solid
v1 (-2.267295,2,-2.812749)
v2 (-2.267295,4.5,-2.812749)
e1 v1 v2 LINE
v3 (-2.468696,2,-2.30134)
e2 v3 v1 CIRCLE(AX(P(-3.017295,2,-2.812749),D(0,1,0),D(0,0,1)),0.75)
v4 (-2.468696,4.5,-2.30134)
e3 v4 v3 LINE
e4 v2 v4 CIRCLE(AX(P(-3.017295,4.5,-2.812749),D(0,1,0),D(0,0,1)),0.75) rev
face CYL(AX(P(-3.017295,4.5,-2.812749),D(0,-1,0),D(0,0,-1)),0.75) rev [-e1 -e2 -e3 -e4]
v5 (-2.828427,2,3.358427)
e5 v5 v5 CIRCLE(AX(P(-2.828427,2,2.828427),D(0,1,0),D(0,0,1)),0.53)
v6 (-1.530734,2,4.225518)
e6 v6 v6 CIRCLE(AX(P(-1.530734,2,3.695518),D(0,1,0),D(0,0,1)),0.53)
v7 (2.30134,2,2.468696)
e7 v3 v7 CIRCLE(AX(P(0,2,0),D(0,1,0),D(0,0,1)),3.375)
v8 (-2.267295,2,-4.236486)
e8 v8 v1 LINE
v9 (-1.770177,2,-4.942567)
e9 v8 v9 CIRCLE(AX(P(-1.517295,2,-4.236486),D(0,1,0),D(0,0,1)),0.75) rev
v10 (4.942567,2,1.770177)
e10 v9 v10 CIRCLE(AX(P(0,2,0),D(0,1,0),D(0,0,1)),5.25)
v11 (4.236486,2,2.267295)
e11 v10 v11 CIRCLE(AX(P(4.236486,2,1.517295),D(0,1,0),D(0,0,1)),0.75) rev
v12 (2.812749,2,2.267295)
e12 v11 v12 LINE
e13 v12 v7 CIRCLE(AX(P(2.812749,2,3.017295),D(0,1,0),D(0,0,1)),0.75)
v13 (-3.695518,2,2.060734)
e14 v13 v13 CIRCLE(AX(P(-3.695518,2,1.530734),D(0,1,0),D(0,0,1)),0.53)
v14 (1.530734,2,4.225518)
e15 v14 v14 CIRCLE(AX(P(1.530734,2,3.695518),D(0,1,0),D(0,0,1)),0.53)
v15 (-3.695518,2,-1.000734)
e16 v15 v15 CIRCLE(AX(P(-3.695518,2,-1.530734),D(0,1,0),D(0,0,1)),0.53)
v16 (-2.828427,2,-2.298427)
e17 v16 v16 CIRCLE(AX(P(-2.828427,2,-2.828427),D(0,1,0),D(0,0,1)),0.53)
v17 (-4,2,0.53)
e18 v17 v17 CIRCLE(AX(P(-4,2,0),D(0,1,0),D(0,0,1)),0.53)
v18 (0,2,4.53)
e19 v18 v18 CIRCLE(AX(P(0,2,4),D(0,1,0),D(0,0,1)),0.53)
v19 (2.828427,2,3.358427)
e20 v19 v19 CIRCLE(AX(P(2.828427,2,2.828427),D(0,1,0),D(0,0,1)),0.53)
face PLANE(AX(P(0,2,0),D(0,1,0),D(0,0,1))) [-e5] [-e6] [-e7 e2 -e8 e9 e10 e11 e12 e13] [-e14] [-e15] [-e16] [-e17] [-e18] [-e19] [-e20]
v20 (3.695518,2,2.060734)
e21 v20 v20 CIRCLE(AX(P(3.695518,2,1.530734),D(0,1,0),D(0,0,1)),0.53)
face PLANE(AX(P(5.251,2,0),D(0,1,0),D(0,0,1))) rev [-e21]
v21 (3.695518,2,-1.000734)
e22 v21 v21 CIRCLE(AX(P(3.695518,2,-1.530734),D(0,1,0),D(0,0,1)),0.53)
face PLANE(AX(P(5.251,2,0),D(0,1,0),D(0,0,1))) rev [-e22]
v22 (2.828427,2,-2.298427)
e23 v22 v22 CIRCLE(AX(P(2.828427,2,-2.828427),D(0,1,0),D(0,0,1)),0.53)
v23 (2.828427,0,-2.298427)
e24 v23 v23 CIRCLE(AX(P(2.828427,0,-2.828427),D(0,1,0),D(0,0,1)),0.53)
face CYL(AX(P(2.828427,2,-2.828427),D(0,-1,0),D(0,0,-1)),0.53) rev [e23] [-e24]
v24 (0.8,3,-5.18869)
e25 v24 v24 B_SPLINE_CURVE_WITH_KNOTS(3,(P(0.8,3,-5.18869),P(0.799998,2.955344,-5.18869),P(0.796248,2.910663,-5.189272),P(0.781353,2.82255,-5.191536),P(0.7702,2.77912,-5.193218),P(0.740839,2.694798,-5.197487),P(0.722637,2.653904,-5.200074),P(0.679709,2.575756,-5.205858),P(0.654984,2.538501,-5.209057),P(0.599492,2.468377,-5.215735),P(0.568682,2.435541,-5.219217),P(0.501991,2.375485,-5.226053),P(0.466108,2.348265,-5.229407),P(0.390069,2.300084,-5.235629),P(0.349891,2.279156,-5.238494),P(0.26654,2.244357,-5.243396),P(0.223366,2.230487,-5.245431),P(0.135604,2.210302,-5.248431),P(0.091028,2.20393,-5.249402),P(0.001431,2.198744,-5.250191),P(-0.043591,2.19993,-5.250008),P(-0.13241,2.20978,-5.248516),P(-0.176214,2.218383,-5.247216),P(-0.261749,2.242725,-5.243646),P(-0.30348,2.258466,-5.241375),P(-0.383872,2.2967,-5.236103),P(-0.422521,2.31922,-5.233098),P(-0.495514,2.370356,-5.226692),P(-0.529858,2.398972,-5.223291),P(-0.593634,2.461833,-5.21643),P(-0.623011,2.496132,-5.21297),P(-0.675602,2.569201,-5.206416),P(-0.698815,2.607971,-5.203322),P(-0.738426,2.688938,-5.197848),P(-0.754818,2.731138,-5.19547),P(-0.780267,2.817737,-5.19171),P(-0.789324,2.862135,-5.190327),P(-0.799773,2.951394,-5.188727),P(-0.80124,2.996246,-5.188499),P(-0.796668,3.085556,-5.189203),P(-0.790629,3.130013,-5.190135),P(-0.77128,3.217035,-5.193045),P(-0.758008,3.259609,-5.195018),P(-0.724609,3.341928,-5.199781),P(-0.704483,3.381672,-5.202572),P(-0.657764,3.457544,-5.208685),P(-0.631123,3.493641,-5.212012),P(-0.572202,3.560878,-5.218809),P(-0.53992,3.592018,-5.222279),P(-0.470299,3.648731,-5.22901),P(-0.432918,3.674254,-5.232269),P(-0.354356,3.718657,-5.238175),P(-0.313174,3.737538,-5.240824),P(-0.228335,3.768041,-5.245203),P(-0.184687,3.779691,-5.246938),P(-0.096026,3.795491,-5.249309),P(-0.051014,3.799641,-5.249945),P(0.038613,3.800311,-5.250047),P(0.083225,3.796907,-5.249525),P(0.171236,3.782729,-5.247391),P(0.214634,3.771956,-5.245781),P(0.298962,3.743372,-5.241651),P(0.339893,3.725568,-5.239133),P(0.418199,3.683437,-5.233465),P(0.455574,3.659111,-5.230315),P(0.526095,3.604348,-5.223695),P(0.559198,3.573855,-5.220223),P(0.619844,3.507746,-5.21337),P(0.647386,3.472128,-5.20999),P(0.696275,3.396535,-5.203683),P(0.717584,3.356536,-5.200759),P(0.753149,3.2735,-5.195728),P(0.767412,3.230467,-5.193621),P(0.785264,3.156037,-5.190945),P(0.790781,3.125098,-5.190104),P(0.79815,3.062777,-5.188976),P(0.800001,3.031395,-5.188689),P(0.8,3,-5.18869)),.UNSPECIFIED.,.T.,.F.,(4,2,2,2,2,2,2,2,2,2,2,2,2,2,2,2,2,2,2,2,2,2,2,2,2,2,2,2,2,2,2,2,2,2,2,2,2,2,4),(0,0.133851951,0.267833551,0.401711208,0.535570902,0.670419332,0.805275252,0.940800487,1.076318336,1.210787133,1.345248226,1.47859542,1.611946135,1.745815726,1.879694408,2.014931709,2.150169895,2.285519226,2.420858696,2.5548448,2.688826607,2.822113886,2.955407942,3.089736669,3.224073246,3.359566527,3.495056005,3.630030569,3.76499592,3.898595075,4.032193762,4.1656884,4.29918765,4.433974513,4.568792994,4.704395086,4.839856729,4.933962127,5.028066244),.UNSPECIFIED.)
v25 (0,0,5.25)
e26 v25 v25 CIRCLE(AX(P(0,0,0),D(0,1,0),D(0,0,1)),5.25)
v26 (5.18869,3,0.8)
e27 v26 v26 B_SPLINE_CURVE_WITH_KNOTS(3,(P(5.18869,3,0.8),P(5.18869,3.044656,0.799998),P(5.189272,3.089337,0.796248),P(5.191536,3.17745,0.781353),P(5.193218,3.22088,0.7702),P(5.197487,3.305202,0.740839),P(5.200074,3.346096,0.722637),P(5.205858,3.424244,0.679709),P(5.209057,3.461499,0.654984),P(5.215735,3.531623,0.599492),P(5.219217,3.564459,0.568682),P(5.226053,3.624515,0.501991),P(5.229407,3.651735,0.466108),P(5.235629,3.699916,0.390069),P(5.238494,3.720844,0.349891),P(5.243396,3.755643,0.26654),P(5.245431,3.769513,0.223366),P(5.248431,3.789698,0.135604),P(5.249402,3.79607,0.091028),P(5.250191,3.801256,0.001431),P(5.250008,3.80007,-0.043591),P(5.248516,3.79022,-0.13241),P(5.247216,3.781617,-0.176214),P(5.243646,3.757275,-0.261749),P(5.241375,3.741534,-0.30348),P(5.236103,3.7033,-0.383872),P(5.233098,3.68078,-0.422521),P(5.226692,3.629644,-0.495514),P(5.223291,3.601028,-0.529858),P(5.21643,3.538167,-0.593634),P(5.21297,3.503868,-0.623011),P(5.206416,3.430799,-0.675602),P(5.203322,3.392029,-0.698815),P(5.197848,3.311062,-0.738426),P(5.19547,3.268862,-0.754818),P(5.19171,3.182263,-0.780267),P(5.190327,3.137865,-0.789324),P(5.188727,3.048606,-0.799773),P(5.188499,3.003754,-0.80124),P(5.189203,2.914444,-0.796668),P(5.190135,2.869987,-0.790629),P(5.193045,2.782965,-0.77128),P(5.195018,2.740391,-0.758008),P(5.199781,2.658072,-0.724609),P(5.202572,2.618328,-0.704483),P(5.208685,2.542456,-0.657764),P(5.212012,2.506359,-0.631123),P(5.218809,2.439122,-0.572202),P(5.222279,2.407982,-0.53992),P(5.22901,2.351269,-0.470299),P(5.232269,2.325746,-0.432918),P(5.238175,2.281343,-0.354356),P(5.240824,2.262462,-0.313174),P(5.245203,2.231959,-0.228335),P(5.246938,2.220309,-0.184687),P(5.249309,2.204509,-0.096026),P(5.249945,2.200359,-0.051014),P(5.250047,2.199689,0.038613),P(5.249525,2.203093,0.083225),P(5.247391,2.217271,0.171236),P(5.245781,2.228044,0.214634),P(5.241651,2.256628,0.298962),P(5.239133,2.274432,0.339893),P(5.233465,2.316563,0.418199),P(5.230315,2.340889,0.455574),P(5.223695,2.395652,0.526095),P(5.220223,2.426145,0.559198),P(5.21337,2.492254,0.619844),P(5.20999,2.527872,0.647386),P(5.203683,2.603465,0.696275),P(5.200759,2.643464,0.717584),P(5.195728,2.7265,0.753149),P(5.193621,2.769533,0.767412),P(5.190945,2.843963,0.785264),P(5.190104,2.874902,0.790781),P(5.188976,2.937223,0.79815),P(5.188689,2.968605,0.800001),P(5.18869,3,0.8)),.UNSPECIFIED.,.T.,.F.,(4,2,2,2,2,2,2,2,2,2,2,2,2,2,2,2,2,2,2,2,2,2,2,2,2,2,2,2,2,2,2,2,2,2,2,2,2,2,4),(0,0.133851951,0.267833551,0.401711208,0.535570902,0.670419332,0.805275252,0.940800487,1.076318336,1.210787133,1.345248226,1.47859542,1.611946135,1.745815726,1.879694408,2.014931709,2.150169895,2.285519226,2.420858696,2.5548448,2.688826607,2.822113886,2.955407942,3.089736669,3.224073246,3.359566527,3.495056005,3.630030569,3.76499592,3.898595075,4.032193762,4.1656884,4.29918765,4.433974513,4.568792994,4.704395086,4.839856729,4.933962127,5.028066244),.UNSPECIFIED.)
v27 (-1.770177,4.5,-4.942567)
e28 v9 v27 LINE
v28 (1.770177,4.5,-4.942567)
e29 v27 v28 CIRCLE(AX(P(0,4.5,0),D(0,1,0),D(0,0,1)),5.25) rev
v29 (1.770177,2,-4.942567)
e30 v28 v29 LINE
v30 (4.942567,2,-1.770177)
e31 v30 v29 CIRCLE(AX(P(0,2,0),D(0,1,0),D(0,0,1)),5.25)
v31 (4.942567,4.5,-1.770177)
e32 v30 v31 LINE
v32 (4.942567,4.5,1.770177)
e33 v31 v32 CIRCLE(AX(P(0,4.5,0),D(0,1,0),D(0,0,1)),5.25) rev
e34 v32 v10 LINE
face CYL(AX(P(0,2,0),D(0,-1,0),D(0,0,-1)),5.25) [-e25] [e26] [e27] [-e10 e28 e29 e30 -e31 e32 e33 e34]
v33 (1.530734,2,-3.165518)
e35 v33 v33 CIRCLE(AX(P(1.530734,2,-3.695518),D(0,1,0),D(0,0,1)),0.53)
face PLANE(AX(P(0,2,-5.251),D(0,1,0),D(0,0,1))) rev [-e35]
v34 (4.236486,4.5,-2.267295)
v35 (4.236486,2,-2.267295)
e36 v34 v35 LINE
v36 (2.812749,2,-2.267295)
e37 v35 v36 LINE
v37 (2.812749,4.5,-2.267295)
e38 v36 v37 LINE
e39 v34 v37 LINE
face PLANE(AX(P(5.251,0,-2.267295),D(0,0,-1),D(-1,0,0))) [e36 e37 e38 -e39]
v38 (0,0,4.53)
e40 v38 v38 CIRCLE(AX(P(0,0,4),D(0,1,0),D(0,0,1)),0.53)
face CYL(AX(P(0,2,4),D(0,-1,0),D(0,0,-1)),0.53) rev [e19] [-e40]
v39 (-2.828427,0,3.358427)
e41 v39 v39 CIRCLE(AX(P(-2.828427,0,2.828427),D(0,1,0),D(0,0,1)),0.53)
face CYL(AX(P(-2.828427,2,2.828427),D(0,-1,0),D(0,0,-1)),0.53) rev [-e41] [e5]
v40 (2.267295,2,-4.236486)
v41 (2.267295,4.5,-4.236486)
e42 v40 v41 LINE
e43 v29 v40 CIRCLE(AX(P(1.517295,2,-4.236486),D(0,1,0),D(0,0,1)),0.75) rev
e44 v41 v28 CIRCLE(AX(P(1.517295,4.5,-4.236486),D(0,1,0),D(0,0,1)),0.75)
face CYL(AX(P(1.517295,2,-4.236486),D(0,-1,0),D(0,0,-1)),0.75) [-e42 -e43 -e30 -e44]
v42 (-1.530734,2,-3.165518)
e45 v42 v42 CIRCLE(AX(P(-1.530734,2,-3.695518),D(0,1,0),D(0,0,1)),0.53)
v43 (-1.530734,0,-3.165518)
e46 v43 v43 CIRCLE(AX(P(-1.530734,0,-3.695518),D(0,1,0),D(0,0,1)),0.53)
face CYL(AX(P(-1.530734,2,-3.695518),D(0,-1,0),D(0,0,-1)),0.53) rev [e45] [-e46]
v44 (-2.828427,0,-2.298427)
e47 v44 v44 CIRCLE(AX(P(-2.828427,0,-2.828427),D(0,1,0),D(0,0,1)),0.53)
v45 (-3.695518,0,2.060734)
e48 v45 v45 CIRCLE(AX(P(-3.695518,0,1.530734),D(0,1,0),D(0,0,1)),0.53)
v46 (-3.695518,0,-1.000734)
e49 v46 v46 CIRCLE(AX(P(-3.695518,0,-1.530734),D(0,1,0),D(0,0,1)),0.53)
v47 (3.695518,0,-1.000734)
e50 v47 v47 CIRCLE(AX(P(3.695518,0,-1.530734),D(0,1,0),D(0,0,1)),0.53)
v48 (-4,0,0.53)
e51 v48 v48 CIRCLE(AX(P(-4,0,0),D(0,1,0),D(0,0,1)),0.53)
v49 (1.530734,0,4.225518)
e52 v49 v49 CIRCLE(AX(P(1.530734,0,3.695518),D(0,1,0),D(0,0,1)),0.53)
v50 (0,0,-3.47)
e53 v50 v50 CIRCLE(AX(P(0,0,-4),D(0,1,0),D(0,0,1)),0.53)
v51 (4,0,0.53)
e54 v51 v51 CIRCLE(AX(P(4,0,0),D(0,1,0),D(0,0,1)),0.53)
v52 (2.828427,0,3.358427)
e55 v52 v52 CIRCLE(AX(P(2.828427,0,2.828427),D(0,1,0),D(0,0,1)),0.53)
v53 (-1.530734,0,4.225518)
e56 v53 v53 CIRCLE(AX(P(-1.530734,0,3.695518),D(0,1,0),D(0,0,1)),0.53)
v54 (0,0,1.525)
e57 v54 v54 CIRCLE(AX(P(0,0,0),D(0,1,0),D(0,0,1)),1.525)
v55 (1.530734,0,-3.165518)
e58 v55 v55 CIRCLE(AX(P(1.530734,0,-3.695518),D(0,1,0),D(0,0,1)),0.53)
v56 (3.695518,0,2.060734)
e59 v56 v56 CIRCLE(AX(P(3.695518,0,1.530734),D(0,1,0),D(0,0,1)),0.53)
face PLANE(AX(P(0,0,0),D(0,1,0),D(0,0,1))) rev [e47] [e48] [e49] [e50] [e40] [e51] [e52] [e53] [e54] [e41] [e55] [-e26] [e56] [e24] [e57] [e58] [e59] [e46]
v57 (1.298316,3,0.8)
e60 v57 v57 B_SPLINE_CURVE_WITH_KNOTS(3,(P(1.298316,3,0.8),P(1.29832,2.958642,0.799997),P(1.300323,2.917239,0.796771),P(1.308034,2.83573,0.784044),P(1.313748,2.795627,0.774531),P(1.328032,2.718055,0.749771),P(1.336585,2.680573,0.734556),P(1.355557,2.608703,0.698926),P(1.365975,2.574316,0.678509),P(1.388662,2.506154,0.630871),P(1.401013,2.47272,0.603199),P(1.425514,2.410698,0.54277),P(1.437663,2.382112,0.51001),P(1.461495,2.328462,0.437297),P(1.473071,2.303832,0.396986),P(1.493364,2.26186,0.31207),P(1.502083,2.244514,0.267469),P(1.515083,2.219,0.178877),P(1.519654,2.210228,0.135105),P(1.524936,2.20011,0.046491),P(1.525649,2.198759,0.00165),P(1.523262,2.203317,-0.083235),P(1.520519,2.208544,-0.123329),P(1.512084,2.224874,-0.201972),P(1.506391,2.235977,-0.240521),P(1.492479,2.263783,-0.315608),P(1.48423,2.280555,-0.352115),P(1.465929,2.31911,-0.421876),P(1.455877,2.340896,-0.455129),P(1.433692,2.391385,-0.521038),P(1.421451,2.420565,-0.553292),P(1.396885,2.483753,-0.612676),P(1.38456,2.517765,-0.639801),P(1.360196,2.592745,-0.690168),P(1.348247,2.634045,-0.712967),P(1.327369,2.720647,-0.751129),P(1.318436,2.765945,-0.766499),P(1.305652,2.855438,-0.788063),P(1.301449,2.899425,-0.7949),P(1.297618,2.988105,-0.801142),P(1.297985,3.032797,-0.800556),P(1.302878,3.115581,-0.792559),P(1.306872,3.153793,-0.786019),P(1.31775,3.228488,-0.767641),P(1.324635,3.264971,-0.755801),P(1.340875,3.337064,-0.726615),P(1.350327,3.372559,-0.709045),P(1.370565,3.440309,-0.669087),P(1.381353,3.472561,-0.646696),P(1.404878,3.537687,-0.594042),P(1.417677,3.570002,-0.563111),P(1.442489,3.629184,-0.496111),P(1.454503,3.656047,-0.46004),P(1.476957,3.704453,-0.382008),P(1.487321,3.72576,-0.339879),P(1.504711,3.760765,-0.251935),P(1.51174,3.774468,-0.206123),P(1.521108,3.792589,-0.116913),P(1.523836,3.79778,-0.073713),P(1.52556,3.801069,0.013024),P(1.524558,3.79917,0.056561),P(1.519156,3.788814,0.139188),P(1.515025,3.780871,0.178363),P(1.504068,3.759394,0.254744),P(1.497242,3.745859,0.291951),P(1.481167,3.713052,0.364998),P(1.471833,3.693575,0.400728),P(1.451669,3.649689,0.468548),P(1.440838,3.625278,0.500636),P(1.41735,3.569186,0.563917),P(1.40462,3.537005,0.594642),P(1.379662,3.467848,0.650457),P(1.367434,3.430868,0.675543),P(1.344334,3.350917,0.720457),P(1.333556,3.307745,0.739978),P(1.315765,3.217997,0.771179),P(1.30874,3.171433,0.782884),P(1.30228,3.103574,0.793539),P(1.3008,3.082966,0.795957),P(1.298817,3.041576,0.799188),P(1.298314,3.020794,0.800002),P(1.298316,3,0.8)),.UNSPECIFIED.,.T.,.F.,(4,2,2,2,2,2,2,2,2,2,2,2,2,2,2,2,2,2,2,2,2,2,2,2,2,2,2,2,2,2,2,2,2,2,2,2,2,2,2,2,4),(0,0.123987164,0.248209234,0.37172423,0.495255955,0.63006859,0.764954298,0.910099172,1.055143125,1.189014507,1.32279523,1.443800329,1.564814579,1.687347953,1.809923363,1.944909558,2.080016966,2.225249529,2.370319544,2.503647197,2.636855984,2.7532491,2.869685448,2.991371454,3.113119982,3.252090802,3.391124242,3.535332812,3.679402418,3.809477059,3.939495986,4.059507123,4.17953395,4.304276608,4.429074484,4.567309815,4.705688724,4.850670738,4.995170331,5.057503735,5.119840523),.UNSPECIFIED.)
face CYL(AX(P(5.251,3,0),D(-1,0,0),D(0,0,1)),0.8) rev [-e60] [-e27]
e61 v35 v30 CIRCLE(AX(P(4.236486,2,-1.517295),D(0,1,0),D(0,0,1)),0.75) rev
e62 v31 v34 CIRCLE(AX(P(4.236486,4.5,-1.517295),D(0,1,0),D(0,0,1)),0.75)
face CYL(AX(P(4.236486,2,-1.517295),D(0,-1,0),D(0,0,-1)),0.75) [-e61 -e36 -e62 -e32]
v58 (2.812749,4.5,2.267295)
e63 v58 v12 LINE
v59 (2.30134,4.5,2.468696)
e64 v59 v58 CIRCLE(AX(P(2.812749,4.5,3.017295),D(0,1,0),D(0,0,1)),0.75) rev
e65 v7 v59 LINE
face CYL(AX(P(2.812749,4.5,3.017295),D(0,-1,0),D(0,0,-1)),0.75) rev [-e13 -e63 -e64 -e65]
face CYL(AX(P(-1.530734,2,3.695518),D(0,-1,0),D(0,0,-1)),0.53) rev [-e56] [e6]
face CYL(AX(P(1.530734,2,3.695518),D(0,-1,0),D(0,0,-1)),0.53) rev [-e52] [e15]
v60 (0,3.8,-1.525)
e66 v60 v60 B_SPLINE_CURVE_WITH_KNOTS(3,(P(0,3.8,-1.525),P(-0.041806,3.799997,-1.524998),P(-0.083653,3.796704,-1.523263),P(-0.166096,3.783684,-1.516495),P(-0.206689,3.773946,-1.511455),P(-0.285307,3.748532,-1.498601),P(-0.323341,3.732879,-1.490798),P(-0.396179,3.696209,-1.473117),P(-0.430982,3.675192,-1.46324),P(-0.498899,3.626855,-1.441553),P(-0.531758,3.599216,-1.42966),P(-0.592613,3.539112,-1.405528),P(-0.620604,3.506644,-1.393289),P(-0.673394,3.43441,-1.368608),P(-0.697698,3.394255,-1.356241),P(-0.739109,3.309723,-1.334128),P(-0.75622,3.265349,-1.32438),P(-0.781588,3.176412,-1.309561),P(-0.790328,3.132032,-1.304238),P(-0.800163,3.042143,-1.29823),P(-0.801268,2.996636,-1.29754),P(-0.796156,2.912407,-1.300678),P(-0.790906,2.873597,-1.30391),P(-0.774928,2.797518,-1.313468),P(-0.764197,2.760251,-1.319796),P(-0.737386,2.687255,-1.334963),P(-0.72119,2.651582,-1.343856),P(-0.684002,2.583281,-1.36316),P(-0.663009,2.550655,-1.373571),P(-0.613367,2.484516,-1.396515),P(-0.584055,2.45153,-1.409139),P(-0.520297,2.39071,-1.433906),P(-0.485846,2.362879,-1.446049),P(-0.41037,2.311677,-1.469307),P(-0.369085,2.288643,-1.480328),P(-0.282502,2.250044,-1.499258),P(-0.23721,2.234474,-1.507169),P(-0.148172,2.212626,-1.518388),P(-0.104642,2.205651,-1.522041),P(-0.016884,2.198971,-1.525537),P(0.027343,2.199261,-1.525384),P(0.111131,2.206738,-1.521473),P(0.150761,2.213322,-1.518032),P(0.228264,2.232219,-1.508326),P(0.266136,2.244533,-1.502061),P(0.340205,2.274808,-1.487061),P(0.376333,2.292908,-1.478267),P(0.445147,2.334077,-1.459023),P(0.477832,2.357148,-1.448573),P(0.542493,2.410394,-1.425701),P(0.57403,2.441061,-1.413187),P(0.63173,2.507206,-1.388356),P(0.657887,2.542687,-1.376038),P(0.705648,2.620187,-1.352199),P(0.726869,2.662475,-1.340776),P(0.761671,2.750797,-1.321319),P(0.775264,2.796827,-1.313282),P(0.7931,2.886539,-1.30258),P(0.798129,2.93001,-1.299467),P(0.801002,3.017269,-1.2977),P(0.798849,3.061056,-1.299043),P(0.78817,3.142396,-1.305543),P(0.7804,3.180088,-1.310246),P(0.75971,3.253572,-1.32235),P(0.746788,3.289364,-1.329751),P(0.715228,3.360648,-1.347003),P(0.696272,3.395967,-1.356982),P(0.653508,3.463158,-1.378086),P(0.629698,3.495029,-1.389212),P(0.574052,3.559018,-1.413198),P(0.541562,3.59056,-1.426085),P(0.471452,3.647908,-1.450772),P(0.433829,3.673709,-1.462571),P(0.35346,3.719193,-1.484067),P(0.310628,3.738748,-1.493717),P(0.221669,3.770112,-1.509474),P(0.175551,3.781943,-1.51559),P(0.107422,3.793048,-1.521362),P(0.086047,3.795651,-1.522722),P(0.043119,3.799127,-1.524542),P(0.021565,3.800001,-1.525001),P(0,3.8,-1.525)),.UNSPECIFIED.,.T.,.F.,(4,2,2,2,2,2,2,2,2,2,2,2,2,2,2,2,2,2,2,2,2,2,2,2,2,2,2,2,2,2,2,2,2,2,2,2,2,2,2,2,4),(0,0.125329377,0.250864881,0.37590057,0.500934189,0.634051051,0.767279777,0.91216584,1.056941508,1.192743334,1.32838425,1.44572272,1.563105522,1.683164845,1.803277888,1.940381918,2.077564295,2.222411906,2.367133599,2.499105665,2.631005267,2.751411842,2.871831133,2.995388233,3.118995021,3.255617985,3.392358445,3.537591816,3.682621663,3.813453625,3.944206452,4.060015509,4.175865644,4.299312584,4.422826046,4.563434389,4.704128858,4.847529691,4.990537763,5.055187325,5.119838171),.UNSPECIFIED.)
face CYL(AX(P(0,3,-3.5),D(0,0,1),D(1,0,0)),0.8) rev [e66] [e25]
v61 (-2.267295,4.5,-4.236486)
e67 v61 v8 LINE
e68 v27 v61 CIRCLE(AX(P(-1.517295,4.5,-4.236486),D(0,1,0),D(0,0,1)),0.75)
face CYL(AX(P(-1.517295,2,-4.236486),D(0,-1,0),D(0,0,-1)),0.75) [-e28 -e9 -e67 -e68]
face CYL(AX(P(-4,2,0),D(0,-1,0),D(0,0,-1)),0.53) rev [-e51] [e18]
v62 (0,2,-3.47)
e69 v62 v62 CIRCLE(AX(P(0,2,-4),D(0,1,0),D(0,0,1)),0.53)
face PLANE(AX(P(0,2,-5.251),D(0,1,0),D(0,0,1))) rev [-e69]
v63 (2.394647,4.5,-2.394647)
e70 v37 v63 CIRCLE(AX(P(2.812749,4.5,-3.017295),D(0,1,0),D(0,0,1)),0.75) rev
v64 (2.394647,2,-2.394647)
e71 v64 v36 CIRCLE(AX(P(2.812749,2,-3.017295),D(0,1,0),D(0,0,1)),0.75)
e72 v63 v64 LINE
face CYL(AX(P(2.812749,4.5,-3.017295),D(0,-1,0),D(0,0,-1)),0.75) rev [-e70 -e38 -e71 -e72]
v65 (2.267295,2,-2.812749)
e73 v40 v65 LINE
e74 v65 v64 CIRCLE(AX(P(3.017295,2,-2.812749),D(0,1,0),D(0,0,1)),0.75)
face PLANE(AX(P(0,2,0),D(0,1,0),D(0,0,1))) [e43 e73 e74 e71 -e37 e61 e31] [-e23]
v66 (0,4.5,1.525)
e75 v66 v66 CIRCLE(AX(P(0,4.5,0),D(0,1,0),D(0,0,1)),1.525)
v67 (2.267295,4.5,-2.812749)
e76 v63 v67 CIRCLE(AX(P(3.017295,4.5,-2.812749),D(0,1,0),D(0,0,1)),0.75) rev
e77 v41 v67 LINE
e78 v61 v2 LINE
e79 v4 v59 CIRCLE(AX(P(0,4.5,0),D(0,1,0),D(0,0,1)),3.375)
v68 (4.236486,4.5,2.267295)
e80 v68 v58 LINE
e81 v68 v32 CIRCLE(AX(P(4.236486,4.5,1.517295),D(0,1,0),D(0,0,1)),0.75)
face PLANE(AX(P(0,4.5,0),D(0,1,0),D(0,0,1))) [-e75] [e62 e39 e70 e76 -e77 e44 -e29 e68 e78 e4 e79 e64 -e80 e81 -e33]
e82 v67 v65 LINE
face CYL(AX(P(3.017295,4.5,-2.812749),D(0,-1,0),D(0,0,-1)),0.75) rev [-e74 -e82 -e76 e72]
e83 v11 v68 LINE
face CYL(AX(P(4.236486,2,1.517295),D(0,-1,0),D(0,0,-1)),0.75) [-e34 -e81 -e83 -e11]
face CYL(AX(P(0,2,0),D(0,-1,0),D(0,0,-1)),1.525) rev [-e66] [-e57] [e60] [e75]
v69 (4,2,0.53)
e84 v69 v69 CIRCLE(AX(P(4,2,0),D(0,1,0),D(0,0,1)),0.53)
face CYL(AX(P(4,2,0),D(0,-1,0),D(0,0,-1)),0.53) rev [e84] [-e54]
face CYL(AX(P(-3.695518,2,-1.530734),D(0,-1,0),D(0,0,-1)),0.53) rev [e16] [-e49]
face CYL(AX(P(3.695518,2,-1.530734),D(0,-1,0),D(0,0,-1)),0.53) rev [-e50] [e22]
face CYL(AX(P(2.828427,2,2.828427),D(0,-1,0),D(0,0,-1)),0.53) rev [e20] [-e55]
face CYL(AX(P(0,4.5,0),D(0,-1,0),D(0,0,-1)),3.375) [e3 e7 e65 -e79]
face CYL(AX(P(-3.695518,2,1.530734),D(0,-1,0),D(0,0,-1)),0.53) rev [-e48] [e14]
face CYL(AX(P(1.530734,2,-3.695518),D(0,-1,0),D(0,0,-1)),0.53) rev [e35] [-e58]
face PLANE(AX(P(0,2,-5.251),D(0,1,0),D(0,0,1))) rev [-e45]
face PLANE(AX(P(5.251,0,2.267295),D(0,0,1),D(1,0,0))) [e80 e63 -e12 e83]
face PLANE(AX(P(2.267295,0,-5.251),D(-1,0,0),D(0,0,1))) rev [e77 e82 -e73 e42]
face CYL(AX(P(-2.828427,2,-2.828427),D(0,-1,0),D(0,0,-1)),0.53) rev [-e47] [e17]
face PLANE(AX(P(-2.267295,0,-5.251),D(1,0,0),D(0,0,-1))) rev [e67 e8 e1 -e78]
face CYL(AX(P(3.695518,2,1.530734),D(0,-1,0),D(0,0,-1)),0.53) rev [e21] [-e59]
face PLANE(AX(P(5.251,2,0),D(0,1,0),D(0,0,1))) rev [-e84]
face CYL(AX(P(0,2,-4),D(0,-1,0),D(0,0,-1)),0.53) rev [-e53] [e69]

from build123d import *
from build123d.topology import SkipClean

# Parameters (mm, degrees)
SKETCH1_R                = 5.25
SKETCH1_R_2              = 0.53
SKETCH1_R_3              = 1.525
BOSS_EXTRUDE1_DEPTH      = 2
SKETCH2_R                = 3.375
SKETCH2_R_2              = 1.525
BOSS_EXTRUDE2_DEPTH      = 2.5
SKETCH3_R                = 0.8
CUT_EXTRUDE1_DEPTH       = 3.5
BOSS_EXTRUDE3_REACH      = 12.386
BOSS_EXTRUDE3_END_RADIUS = 5.25
SKETCH5_W                = 4.534589286
SKETCH5_H                = 2.5
SKETCH5_R                = 0.8
BOSS_EXTRUDE4_REACH      = 12.386
BOSS_EXTRUDE4_END_RADIUS = 5.25
SKETCH6_W                = 4.534589286
SKETCH6_H                = 2.5
SKETCH6_R                = 0.8
CUT_EXTRUDE2_DEPTH       = 10
CUT_EXTRUDE2_DEPTH_BACK  = 3
SKETCH6_3_R              = 0.8
FILLET1_R                = 0.75
FILLET2_R                = 0.75


with BuildPart() as part:
    # Sketch1 → Boss-Extrude1 (new body)
    with BuildSketch(Plane(origin=(0, 0, 0), x_dir=(1, 0, 0), z_dir=(0, 1, 0))):
        with Locations(Location((0, 0, 0), (0, 0, 270))):
            Circle(SKETCH1_R)
        with Locations(Location((0, 4, 0), (0, 0, 270))):
            Circle(SKETCH1_R_2, mode=Mode.SUBTRACT)
        with Locations(Location((1.530733729, 3.69551813, 0), (0, 0, 270))):
            Circle(SKETCH1_R_2, mode=Mode.SUBTRACT)
        with Locations(Location((2.828427125, 2.828427125, 0), (0, 0, 270))):
            Circle(SKETCH1_R_2, mode=Mode.SUBTRACT)
        with Locations(Location((3.69551813, 1.530733729, 0), (0, 0, 270))):
            Circle(SKETCH1_R_2, mode=Mode.SUBTRACT)
        with Locations(Location((4, 0, 0), (0, 0, 270))):
            Circle(SKETCH1_R_2, mode=Mode.SUBTRACT)
        with Locations(Location((3.69551813, -1.530733729, 0), (0, 0, 270))):
            Circle(SKETCH1_R_2, mode=Mode.SUBTRACT)
        with Locations(Location((2.828427125, -2.828427125, 0), (0, 0, 270))):
            Circle(SKETCH1_R_2, mode=Mode.SUBTRACT)
        with Locations(Location((1.530733729, -3.69551813, 0), (0, 0, 270))):
            Circle(SKETCH1_R_2, mode=Mode.SUBTRACT)
        with Locations(Location((0, -4, 0), (0, 0, 270))):
            Circle(SKETCH1_R_2, mode=Mode.SUBTRACT)
        with Locations(Location((-1.530733729, -3.69551813, 0), (0, 0, 270))):
            Circle(SKETCH1_R_2, mode=Mode.SUBTRACT)
        with Locations(Location((-2.828427125, -2.828427125, 0), (0, 0, 270))):
            Circle(SKETCH1_R_2, mode=Mode.SUBTRACT)
        with Locations(Location((-3.69551813, -1.530733729, 0), (0, 0, 270))):
            Circle(SKETCH1_R_2, mode=Mode.SUBTRACT)
        with Locations(Location((-4, 0, 0), (0, 0, 270))):
            Circle(SKETCH1_R_2, mode=Mode.SUBTRACT)
        with Locations(Location((-3.69551813, 1.530733729, 0), (0, 0, 270))):
            Circle(SKETCH1_R_2, mode=Mode.SUBTRACT)
        with Locations(Location((-2.828427125, 2.828427125, 0), (0, 0, 270))):
            Circle(SKETCH1_R_2, mode=Mode.SUBTRACT)
        with Locations(Location((-1.530733729, 3.69551813, 0), (0, 0, 270))):
            Circle(SKETCH1_R_2, mode=Mode.SUBTRACT)
        with Locations(Location((0, 0, 0), (0, 0, 270))):
            Circle(SKETCH1_R_3, mode=Mode.SUBTRACT)
    extrude(amount=BOSS_EXTRUDE1_DEPTH)

    # Sketch2 → Boss-Extrude2 (add)
    with BuildSketch(Plane(origin=(0, 2, 0), x_dir=(1, 0, 0), z_dir=(0, 1, 0))):
        with Locations(Location((0, 0, 0), (0, 0, 270))):
            Circle(SKETCH2_R)
        with Locations(Location((0, 0, 0), (0, 0, 270))):
            Circle(SKETCH2_R_2, mode=Mode.SUBTRACT)
    extrude(amount=BOSS_EXTRUDE2_DEPTH)

    # Sketch3 → Cut-Extrude1 (cut)
    with BuildSketch(Plane.XY):
        with Locations(Location((0, 3, 0), (0, 0, 90))):
            Circle(SKETCH3_R)
    extrude(amount=-CUT_EXTRUDE1_DEPTH, mode=Mode.SUBTRACT)

    # Boss-Extrude3: up to this cylinder (the profile starts inside it)
    with SkipClean():  # the faces are left unmerged after this step: merging them gives an invalid solid
        boss_extrude3_end = Plane(origin=(0, 2.051781, 0), z_dir=(0, -1, 0)) * Cylinder(BOSS_EXTRUDE3_END_RADIUS, 36.272, mode=Mode.PRIVATE)
        # Sketch5 → Boss-Extrude3 (add, up to the surface)
        with BuildSketch(Plane.XY.offset(-2.5), mode=Mode.PRIVATE) as boss_extrude3_sk1:
            with Locations((0, 3.25)):
                Rectangle(SKETCH5_W, SKETCH5_H)
            with Locations((0, 3)):
                Circle(SKETCH5_R, mode=Mode.SUBTRACT)
        boss_extrude3_tool1 = extrude(boss_extrude3_sk1.sketch, amount=-BOSS_EXTRUDE3_REACH, mode=Mode.PRIVATE) & boss_extrude3_end
        add(boss_extrude3_tool1.solids().sort_by_distance((0, 2.051781, -2.5))[0])

    # Boss-Extrude4: up to this cylinder (the profile starts inside it)
    with SkipClean():  # the faces are left unmerged after this step: merging them gives an invalid solid
        boss_extrude4_end = Plane(origin=(0, 3.25, 0), z_dir=(0, -1, 0)) * Cylinder(BOSS_EXTRUDE4_END_RADIUS, 36.272, mode=Mode.PRIVATE)
        # Sketch6 → Boss-Extrude4 (add, up to the surface)
        with BuildSketch(Plane(origin=(2.5, 0, 0), x_dir=(0, 0, -1), z_dir=(1, 0, 0)), mode=Mode.PRIVATE) as boss_extrude4_sk1:
            with Locations((0, 3.25)):
                Rectangle(SKETCH6_W, SKETCH6_H)
            with Locations(Location((0, 3, 0), (0, 0, 180))):
                Circle(SKETCH6_R, mode=Mode.SUBTRACT)
        boss_extrude4_tool1 = extrude(boss_extrude4_sk1.sketch, amount=BOSS_EXTRUDE4_REACH, mode=Mode.PRIVATE) & boss_extrude4_end
        add(boss_extrude4_tool1.solids().sort_by_distance((2.5, 3.25, 2.215514))[0])

    # Sketch6<3> → Cut-Extrude2 (cut, two sides: drawn at the far end of the back side and taken through both)
    with SkipClean():  # the faces are left unmerged after this step: merging them gives an invalid solid
        with BuildSketch(Plane(origin=(2.5, 0, 0), x_dir=(0, 0, -1), z_dir=(1, 0, 0)).offset(-CUT_EXTRUDE2_DEPTH_BACK)):
            with Locations(Location((0, 3, 0), (0, 0, 180))):
                Circle(SKETCH6_3_R)
        extrude(amount=CUT_EXTRUDE2_DEPTH + CUT_EXTRUDE2_DEPTH_BACK, mode=Mode.SUBTRACT)

    # Fillet1
    fillet1_edges = [part.edges().sort_by_distance(p)[0] for p in [
        (2.267294643, 3.25, -4.735174231),
        (-2.267294643, 3.25, -4.735174231),
        (4.735174231, 3.25, 2.267294643),
        (4.735174231, 3.25, -2.267294643),
    ]]
    fillet(fillet1_edges, radius=FILLET1_R)

    # Fillet2
    # the kernel refuses this fillet: 0.75 mm, written as the material it adds along each edge
    with BuildSketch(Plane(origin=(2.267294643, 4.5, -2.5), x_dir=(0, 0, -1), z_dir=(0, -1, 0))) as fillet2_piece_1:
        with BuildLine():
            CenterArc((0.312749195, 0.75), FILLET2_R, 227.009382104, 42.990617896)
            ThreePointArc((-0.198659749, 0.201400974), (-0.09721877, 0.102782858), (0, 0))
            Line((0, 0), (0.312749195, 0))
        make_face()
    extrude(amount=3.281872988)
    with BuildSketch(Plane(origin=(-2.267294643, 1.218127012, -2.5), x_dir=(-0.7119351792170611, 0, 0.7022451855250923), z_dir=(0, 1, 0))) as fillet2_piece_2:
        with BuildLine():
            CenterArc((0.314324768, -0.749341043), FILLET2_R, 92.40196785, 42.990617896)
            Line((-0.219626617, -0.222657154), (0, 0))
            ThreePointArc((0, 0), (0.141446146, -0.002965304), (0.282892291, 0))
        make_face()
    extrude(amount=3.281872988)
    with BuildSketch(Plane(origin=(2.5, 1.218127012, 2.267294643), x_dir=(1, 0, 0), z_dir=(0, 1, 0))) as fillet2_piece_3:
        with BuildLine():
            CenterArc((0.312749195, -0.75), FILLET2_R, 90, 42.990617896)
            ThreePointArc((-0.198659749, -0.201400974), (-0.09721877, -0.102782858), (0, 0))
            Line((0, 0), (0.312749195, 0))
        make_face()
    extrude(amount=3.281872988)
    with BuildSketch(Plane(origin=(2.5, 4.5, -2.267294643), x_dir=(-0.7022451855250915, 0, -0.7119351792170617), z_dir=(0, -1, 0))) as fillet2_piece_4:
        with BuildLine():
            CenterArc((0.314324768, 0.749341043), FILLET2_R, 224.607414254, 42.990617896)
            Line((-0.219626617, 0.222657154), (0, 0))
            ThreePointArc((0, 0), (0.141446146, 0.002965304), (0.282892291, 0))
        make_face()
    extrude(amount=3.281872988)


solid = part.part
